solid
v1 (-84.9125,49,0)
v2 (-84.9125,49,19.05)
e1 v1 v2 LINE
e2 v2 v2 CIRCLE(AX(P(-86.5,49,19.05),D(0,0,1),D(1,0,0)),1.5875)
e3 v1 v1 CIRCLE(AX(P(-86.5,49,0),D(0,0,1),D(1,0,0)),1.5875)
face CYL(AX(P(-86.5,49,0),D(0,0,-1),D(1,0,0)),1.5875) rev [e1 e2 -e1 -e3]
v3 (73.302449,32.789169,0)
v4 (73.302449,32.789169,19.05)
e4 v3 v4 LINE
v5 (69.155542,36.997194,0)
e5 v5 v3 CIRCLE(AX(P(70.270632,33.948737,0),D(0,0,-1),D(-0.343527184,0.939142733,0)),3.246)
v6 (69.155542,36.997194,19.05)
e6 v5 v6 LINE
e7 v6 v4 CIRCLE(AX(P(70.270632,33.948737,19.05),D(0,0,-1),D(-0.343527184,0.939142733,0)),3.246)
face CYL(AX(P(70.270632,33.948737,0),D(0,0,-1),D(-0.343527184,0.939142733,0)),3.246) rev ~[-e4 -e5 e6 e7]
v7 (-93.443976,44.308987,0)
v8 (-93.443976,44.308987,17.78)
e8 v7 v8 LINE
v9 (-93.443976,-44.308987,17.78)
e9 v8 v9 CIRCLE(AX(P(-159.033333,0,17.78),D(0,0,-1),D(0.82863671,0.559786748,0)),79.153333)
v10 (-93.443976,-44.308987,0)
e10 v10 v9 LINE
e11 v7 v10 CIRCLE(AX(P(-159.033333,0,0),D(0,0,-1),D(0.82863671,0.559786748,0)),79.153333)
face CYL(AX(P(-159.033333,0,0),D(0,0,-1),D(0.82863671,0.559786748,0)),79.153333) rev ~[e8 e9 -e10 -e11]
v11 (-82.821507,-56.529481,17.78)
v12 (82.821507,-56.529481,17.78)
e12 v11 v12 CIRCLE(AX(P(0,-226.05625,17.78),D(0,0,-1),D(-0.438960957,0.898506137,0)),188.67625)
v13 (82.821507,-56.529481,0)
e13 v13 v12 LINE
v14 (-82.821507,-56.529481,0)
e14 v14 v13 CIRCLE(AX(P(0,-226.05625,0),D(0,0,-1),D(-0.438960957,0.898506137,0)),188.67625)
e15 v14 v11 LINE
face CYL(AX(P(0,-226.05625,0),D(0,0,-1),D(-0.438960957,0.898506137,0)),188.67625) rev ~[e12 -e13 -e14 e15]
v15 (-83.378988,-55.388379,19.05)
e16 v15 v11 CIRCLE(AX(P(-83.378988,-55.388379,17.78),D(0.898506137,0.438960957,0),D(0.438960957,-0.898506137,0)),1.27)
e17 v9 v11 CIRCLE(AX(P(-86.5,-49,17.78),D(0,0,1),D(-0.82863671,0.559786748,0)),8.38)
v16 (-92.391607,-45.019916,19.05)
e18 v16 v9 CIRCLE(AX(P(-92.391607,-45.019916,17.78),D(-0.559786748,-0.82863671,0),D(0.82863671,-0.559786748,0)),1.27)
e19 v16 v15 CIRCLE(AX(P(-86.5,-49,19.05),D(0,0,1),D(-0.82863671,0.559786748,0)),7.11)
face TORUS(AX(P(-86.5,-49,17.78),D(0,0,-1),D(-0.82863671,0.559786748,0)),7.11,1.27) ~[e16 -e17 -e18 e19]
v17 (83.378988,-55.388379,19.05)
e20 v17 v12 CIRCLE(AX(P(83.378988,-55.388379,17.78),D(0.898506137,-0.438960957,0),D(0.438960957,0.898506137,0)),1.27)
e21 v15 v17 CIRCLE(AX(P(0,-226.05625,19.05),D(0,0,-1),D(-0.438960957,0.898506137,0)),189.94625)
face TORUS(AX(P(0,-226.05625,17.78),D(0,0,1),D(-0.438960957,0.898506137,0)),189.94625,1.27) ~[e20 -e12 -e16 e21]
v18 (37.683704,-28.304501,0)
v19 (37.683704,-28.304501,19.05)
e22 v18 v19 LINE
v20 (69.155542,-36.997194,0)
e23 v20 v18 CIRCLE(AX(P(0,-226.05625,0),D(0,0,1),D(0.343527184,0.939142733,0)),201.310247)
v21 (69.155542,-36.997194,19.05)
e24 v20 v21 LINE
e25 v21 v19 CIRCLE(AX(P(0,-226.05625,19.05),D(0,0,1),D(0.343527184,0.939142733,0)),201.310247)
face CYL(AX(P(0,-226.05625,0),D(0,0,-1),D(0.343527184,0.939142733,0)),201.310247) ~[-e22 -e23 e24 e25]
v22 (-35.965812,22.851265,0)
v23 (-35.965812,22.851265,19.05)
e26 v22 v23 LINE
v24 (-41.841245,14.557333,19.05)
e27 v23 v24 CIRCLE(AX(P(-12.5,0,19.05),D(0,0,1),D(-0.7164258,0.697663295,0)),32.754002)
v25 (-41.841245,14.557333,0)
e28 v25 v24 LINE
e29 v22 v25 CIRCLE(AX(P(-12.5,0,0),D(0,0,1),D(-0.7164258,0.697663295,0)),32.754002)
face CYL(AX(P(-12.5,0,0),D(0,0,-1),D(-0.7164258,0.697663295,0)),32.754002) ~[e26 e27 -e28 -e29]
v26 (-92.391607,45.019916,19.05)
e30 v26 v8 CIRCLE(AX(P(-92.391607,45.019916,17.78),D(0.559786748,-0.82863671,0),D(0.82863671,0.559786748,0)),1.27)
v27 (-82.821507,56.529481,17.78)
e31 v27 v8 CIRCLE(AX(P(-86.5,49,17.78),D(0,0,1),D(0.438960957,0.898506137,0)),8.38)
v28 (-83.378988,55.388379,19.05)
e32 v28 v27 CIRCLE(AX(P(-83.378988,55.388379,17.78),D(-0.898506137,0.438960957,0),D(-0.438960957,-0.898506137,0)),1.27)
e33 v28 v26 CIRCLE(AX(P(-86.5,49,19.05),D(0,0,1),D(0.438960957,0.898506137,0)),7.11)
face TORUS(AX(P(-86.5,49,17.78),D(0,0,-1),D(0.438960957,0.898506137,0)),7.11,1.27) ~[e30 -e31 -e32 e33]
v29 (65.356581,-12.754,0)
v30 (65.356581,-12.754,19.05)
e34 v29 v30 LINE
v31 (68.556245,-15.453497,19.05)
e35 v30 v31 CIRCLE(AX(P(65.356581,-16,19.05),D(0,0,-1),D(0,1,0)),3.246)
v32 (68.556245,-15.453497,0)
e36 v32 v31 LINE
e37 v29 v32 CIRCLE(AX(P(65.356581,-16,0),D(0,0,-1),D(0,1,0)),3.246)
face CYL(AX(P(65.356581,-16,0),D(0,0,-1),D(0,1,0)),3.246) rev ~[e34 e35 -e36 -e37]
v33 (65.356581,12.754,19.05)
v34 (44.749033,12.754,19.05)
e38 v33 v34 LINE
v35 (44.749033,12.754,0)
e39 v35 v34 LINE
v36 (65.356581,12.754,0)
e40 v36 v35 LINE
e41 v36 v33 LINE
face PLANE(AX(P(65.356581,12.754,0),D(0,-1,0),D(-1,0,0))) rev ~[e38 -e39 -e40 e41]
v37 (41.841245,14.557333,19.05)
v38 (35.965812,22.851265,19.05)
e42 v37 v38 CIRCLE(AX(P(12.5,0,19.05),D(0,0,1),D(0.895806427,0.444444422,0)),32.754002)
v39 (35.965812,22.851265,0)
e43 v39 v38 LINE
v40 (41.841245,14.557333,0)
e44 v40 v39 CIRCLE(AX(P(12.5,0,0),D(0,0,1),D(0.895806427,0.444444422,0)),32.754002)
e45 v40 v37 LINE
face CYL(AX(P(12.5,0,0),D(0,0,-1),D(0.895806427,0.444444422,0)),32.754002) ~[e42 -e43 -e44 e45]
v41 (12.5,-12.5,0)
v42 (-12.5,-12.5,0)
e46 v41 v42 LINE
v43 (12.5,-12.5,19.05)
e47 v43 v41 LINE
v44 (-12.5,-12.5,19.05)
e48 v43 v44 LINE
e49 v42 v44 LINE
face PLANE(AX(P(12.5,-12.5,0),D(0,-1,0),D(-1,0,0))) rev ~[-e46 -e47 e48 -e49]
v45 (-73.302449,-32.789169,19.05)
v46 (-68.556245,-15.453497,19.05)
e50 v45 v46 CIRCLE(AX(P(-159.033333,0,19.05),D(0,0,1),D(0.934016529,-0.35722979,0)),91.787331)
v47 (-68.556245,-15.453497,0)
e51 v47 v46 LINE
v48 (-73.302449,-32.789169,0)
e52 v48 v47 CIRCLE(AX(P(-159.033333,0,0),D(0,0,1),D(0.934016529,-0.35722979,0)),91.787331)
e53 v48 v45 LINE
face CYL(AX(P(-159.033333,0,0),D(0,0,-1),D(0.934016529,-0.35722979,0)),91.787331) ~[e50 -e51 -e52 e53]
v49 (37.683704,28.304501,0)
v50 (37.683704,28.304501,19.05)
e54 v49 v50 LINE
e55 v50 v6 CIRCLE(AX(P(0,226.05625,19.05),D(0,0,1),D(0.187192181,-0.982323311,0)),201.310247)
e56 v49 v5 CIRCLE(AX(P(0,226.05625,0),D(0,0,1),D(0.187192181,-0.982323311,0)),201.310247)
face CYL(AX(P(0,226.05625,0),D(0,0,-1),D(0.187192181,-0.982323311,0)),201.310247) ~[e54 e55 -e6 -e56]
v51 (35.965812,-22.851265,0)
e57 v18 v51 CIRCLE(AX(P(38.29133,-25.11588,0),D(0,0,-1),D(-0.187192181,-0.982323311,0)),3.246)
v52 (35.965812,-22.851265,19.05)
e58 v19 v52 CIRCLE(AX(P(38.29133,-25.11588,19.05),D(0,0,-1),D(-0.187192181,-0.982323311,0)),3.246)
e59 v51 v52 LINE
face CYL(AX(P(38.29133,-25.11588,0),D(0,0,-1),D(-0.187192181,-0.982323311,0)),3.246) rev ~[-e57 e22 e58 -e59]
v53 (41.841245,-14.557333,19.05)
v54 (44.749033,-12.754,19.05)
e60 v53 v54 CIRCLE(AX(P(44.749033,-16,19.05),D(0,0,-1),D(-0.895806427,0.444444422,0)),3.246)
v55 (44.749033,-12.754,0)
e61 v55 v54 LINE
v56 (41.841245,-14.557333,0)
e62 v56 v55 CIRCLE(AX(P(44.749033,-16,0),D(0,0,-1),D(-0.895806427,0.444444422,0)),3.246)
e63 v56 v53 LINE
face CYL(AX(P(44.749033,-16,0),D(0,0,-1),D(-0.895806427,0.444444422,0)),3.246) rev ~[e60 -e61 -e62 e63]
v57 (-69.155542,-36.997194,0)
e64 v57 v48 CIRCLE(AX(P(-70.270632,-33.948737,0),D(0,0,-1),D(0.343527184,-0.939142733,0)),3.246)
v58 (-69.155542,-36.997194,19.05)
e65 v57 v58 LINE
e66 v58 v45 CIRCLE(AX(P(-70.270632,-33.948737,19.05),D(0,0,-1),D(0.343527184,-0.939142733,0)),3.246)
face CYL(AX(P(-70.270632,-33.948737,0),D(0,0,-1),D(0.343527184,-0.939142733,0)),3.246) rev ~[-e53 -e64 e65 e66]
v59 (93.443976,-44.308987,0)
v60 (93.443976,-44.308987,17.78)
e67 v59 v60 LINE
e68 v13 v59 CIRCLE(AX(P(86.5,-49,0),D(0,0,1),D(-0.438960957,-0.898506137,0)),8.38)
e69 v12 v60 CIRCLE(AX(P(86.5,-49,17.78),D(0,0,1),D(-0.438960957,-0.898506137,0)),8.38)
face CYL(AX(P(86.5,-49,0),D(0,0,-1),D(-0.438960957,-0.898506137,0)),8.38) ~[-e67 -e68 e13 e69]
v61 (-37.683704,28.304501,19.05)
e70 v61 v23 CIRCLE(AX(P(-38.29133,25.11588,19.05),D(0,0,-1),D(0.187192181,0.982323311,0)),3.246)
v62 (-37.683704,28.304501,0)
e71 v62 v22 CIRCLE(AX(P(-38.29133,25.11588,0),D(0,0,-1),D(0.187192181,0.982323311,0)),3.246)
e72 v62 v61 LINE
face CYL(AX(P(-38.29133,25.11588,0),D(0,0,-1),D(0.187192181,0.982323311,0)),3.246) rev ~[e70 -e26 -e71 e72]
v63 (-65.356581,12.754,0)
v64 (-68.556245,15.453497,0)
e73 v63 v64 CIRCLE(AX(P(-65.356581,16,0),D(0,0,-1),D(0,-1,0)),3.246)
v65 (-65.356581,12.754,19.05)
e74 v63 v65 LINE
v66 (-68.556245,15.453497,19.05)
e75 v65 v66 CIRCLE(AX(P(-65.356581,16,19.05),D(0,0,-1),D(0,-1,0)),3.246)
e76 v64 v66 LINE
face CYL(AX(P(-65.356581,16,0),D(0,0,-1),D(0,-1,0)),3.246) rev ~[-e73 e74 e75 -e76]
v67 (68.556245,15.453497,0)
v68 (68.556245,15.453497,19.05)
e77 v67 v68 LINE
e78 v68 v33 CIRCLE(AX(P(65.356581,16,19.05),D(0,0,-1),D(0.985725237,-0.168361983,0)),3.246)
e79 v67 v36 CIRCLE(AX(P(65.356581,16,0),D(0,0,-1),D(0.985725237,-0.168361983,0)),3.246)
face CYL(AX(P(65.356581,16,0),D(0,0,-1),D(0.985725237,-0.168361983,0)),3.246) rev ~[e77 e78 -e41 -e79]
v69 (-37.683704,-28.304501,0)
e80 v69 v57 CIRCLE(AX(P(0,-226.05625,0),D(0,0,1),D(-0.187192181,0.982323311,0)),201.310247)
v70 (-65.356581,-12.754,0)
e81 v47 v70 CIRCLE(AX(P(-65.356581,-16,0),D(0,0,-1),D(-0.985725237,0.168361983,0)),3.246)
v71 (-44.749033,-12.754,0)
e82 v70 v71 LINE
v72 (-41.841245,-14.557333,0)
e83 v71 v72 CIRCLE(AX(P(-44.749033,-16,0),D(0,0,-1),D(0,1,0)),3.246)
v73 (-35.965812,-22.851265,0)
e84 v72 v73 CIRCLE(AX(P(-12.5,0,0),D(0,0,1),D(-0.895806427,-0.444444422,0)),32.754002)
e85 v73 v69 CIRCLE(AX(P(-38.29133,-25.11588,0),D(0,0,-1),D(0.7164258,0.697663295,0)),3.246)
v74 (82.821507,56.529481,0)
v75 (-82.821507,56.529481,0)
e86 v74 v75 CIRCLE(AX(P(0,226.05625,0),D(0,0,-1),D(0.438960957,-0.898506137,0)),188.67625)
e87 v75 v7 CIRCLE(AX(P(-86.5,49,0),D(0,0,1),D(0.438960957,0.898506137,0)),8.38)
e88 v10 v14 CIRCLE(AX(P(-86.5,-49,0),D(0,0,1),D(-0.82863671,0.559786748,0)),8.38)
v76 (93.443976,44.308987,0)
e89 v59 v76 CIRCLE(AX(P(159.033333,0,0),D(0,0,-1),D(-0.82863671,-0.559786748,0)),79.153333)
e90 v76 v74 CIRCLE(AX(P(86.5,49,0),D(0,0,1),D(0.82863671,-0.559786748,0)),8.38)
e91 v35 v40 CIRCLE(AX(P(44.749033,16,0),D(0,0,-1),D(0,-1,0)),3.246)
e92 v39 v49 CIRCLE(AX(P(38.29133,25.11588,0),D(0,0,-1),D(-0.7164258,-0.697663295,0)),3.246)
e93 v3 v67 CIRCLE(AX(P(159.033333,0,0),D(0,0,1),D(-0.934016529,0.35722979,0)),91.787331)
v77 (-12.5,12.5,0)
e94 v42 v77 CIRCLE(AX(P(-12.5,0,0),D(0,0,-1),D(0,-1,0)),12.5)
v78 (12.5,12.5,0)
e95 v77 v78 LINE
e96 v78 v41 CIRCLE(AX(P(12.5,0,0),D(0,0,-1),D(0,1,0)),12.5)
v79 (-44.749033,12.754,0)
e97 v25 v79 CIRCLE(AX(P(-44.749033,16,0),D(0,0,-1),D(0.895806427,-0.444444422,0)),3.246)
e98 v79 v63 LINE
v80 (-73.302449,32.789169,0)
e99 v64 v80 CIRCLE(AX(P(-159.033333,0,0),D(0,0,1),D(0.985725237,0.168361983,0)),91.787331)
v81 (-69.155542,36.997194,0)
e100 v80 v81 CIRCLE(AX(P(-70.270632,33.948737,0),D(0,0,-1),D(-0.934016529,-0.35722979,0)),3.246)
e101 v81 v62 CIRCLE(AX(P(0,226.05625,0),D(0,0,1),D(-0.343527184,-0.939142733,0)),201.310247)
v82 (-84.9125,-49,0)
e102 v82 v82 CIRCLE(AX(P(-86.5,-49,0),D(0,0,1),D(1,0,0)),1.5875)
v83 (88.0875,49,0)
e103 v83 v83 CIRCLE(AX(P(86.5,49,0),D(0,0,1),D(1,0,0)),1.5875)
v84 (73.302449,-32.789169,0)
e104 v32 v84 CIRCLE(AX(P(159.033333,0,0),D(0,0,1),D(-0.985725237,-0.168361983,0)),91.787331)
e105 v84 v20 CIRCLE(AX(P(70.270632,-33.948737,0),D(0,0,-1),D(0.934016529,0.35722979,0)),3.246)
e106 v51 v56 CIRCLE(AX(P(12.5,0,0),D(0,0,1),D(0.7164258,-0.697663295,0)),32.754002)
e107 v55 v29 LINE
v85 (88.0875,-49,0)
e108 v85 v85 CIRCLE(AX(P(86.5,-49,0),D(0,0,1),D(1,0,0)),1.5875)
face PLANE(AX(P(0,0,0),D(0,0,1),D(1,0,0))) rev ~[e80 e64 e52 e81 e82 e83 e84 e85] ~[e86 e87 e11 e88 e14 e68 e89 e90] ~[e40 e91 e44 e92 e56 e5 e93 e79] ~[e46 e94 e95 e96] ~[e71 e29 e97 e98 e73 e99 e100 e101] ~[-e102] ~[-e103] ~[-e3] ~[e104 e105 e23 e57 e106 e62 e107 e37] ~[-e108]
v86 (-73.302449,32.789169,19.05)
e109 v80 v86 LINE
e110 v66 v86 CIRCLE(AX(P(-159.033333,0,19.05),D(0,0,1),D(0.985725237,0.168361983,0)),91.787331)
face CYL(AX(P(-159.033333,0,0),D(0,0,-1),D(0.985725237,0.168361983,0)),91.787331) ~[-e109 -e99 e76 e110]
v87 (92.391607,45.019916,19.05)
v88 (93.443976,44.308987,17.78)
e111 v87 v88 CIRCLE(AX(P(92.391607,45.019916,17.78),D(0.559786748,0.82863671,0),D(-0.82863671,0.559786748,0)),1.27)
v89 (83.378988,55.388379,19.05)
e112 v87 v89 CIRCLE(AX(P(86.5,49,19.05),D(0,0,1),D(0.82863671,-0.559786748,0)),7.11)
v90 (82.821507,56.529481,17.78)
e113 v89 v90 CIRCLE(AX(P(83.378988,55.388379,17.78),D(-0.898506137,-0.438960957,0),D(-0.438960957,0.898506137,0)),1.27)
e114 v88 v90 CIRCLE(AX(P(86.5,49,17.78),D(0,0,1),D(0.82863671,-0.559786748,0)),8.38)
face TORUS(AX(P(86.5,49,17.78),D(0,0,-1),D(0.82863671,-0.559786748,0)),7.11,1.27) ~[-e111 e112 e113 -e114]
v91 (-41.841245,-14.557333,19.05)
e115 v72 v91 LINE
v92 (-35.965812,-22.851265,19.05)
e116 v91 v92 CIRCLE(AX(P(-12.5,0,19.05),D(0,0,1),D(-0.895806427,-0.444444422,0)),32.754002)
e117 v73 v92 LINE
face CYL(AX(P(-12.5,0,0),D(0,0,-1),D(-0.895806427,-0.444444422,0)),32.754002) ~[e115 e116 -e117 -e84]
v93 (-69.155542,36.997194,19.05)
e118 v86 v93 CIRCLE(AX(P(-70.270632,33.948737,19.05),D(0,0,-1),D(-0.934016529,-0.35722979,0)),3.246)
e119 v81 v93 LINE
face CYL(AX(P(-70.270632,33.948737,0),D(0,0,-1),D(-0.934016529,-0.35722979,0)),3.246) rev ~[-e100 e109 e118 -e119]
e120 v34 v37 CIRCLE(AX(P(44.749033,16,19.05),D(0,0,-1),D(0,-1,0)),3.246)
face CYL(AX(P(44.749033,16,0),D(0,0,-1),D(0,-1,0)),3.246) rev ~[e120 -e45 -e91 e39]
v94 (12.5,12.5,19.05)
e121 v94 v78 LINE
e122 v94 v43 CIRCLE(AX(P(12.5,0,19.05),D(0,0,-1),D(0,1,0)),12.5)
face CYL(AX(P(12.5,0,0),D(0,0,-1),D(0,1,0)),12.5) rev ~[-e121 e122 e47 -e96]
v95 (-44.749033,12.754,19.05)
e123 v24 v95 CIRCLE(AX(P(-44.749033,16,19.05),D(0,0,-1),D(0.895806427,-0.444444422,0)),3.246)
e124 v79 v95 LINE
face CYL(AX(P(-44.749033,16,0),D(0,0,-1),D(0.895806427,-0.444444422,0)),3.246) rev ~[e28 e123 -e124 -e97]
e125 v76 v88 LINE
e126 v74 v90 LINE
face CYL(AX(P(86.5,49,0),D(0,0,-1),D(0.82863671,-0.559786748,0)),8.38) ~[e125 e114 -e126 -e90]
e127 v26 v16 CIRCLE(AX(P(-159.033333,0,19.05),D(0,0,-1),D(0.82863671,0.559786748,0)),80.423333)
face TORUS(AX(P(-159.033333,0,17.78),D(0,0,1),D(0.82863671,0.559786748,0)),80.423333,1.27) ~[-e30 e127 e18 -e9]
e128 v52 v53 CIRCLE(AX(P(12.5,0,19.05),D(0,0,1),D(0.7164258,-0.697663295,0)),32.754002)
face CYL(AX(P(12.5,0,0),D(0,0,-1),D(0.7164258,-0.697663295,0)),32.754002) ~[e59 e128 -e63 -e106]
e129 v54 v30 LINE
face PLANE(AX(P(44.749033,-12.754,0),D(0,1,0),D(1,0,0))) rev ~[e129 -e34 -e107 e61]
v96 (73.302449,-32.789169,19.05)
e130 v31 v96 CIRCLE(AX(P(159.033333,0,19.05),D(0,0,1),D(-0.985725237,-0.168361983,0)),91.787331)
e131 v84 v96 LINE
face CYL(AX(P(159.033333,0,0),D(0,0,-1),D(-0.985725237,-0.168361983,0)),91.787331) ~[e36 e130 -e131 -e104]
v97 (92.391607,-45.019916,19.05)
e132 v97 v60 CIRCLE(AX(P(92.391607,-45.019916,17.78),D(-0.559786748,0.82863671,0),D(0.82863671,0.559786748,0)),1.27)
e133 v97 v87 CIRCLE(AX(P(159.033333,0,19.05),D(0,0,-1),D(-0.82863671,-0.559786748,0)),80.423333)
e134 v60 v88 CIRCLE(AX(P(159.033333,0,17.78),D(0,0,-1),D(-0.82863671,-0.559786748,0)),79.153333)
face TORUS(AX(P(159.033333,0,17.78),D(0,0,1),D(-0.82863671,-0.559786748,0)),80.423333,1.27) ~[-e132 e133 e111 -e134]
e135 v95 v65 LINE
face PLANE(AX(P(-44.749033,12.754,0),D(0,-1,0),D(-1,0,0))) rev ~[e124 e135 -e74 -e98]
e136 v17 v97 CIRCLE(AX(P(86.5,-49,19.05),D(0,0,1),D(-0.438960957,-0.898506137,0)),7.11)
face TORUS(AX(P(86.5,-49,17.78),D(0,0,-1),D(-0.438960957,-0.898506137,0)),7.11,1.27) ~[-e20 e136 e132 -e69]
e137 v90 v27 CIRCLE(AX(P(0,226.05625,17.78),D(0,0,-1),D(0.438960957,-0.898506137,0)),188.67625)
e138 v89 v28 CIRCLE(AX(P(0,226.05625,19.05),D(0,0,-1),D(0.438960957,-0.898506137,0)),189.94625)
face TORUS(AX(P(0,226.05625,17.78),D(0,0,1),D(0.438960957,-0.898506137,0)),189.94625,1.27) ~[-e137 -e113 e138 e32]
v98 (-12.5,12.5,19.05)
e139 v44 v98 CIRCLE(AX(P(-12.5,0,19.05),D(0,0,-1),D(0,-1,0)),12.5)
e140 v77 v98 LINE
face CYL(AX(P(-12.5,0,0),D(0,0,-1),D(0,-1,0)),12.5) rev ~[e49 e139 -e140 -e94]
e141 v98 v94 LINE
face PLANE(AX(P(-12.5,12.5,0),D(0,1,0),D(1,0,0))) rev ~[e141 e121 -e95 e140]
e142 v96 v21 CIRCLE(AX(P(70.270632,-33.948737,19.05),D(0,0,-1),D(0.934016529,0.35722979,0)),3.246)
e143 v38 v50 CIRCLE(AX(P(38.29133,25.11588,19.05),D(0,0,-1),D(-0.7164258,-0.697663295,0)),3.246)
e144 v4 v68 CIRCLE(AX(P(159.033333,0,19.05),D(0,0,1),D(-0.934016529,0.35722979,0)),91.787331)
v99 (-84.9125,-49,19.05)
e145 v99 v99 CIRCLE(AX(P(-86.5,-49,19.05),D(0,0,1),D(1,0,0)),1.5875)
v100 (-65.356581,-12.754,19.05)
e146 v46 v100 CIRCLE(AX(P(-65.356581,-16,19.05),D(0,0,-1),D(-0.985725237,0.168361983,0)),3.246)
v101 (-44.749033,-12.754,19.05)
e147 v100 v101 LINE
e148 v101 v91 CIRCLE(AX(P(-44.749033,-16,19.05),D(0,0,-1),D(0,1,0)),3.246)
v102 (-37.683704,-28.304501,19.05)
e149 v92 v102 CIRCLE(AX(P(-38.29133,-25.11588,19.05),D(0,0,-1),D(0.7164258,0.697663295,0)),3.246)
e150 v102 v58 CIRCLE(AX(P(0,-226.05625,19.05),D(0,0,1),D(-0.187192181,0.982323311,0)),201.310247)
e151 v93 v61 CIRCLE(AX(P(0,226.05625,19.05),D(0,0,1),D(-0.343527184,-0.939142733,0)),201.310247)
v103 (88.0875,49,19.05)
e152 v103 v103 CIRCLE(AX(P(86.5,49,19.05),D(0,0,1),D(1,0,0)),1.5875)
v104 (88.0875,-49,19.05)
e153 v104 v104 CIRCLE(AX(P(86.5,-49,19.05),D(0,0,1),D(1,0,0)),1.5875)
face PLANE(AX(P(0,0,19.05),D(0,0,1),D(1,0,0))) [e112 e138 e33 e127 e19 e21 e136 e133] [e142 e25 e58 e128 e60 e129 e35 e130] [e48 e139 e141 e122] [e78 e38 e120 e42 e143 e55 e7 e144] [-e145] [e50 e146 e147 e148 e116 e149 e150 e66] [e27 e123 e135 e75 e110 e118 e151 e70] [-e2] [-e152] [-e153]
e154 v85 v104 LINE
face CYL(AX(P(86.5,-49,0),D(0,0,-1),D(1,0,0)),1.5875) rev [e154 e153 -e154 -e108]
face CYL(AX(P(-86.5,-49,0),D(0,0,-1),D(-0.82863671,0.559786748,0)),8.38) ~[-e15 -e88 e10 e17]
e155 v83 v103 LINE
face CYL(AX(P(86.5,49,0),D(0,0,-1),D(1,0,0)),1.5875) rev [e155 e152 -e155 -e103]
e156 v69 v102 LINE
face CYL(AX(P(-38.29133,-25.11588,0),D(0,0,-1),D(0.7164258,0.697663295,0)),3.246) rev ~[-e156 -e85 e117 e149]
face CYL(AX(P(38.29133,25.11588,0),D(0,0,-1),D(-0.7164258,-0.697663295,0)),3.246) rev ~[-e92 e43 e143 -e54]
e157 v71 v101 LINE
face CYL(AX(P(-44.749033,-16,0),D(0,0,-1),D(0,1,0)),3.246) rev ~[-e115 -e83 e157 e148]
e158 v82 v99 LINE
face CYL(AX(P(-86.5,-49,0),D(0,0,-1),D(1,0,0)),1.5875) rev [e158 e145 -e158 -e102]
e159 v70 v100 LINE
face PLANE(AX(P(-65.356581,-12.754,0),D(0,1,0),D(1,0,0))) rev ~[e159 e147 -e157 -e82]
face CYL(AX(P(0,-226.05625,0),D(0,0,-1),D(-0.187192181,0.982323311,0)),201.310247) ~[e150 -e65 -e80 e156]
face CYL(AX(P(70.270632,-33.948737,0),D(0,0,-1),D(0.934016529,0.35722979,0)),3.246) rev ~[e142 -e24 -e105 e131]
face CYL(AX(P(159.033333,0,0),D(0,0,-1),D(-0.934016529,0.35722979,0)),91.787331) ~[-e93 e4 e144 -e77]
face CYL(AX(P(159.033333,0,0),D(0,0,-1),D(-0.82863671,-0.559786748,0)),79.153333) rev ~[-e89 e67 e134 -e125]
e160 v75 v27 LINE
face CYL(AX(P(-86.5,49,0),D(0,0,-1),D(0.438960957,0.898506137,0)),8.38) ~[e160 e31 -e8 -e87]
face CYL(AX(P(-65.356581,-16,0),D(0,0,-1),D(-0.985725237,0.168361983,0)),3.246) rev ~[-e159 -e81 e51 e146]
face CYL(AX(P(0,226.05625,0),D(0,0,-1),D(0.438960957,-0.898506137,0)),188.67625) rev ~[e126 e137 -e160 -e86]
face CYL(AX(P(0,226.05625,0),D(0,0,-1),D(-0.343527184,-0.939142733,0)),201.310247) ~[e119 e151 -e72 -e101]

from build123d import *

# Parameters (mm, degrees)
F0_R     = 1.5875
F1_DEPTH = 19.05
F0_R_2   = 3.175
F2_DEPTH = 6.35
F3_R     = 1.27


with BuildPart() as f1:
    # F0 (on Top) → F1 (new body)
    with BuildSketch(Plane.XY):
        with BuildLine():
            ThreePointArc((82.8215071839, 56.5294814298), (0, 37.38), (-82.8215071839, 56.5294814298))
            ThreePointArc((-82.8215071839, 56.5294814298), (-92.8246316261, 54.4975844509), (-93.4439756283, 44.3089870526))
            ThreePointArc((-93.4439756283, 44.3089870526), (-79.88, 0), (-93.4439756283, -44.3089870526))
            ThreePointArc((-93.4439756283, -44.3089870526), (-92.8246316261, -54.4975844509), (-82.8215071839, -56.5294814298))
            ThreePointArc((-82.8215071839, -56.5294814298), (0, -37.38), (82.8215071839, -56.5294814298))
            ThreePointArc((82.8215071839, -56.5294814298), (92.8246316261, -54.4975844509), (93.4439756283, -44.3089870526))
            ThreePointArc((93.4439756283, -44.3089870526), (79.88, 0), (93.4439756283, 44.3089870526))
            ThreePointArc((93.4439756283, 44.3089870526), (92.8246316261, 54.4975844509), (82.8215071839, 56.5294814298))
        make_face()
        with Locations((-86.5, -49)):
            Circle(F0_R, mode=Mode.SUBTRACT)
        with BuildLine():
            ThreePointArc((-44.7490329893, -12.754), (-43.0382407412, -13.2414304642), (-41.8412453259, -14.557333405))
            ThreePointArc((-41.8412453259, -14.557333405), (-39.2272080278, -18.9335940639), (-35.965811948, -22.8512647956))
            ThreePointArc((-35.965811948, -22.8512647956), (-35.1953196756, -26.0911928639), (-37.6837042763, -28.304501317))
            ThreePointArc((-37.6837042763, -28.304501317), (-53.5961461859, -32.0117479156), (-69.1555424288, -36.9971940769))
            ThreePointArc((-69.1555424288, -36.9971940769), (-72.5826288572, -36.2271539786), (-73.3024493232, -32.7891688656))
            ThreePointArc((-73.3024493232, -32.7891688656), (-70.5039949655, -24.2377869494), (-68.556245082, -15.4534970032))
            ThreePointArc((-68.556245082, -15.4534970032), (-67.4497325668, -13.5190259244), (-65.356580963, -12.754))
            Line((-65.356580963, -12.754), (-44.7490329893, -12.754))
        make_face(mode=Mode.SUBTRACT)
        with Locations((86.5, -49)):
            Circle(F0_R, mode=Mode.SUBTRACT)
        with BuildLine():
            ThreePointArc((-12.5, -12.5), (-25, 0), (-12.5, 12.5))
            Line((-12.5, 12.5), (12.5, 12.5))
            ThreePointArc((12.5, 12.5), (25, 0), (12.5, -12.5))
            Line((12.5, -12.5), (-12.5, -12.5))
        make_face(mode=Mode.SUBTRACT)
        with BuildLine():
            ThreePointArc((65.356580963, -12.754), (67.4497325668, -13.5190259244), (68.556245082, -15.4534970032))
            ThreePointArc((68.556245082, -15.4534970032), (70.5039949655, -24.2377869494), (73.3024493232, -32.7891688656))
            ThreePointArc((73.3024493232, -32.7891688656), (72.5826288572, -36.2271539786), (69.1555424288, -36.9971940769))
            ThreePointArc((69.1555424288, -36.9971940769), (53.5961461859, -32.0117479156), (37.6837042763, -28.304501317))
            ThreePointArc((37.6837042763, -28.304501317), (35.1953196756, -26.0911928639), (35.965811948, -22.8512647956))
            ThreePointArc((35.965811948, -22.8512647956), (39.2272080278, -18.9335940639), (41.8412453259, -14.557333405))
            ThreePointArc((41.8412453259, -14.557333405), (43.0382407412, -13.2414304642), (44.7490329893, -12.754))
            Line((44.7490329893, -12.754), (65.356580963, -12.754))
        make_face(mode=Mode.SUBTRACT)
        with BuildLine():
            ThreePointArc((-73.3024493232, 32.7891688656), (-72.5826288572, 36.2271539786), (-69.1555424288, 36.9971940769))
            ThreePointArc((-69.1555424288, 36.9971940769), (-53.5961461859, 32.0117479156), (-37.6837042763, 28.304501317))
            ThreePointArc((-37.6837042763, 28.304501317), (-35.1953196756, 26.0911928639), (-35.965811948, 22.8512647956))
            ThreePointArc((-35.965811948, 22.8512647956), (-39.2272080278, 18.9335940639), (-41.8412453259, 14.557333405))
            ThreePointArc((-41.8412453259, 14.557333405), (-43.0382407412, 13.2414304642), (-44.7490329893, 12.754))
            Line((-44.7490329893, 12.754), (-65.356580963, 12.754))
            ThreePointArc((-65.356580963, 12.754), (-67.4497325668, 13.5190259244), (-68.556245082, 15.4534970032))
            ThreePointArc((-68.556245082, 15.4534970032), (-70.5039949655, 24.2377869494), (-73.3024493232, 32.7891688656))
        make_face(mode=Mode.SUBTRACT)
        with Locations((-86.5, 49)):
            Circle(F0_R, mode=Mode.SUBTRACT)
        with BuildLine():
            ThreePointArc((35.965811948, 22.8512647956), (35.1953196756, 26.0911928639), (37.6837042763, 28.304501317))
            ThreePointArc((37.6837042763, 28.304501317), (53.5961461859, 32.0117479156), (69.1555424288, 36.9971940769))
            ThreePointArc((69.1555424288, 36.9971940769), (72.5826288572, 36.2271539786), (73.3024493232, 32.7891688656))
            ThreePointArc((73.3024493232, 32.7891688656), (70.5039949655, 24.2377869494), (68.556245082, 15.4534970032))
            ThreePointArc((68.556245082, 15.4534970032), (67.4497325668, 13.5190259244), (65.356580963, 12.754))
            Line((65.356580963, 12.754), (44.7490329893, 12.754))
            ThreePointArc((44.7490329893, 12.754), (43.0382407412, 13.2414304642), (41.8412453259, 14.557333405))
            ThreePointArc((41.8412453259, 14.557333405), (39.2272080278, 18.9335940639), (35.965811948, 22.8512647956))
        make_face(mode=Mode.SUBTRACT)
        with Locations((86.5, 49)):
            Circle(F0_R, mode=Mode.SUBTRACT)
    extrude(amount=F1_DEPTH)

    # F0 (on Top) → F2 (cut)
    with BuildSketch(Plane.XY):
        with BuildLine():
            Line((12.5, 12.5), (-12.5, 12.5))
            ThreePointArc((-12.5, 12.5), (-25, 0), (-12.5, -12.5))
            Line((-12.5, -12.5), (12.5, -12.5))
            ThreePointArc((12.5, -12.5), (25, 0), (12.5, 12.5))
        make_face()
        with Locations((-12.5, 0)):
            Circle(F0_R_2, mode=Mode.SUBTRACT)
        with Locations((12.5, 0)):
            Circle(F0_R_2, mode=Mode.SUBTRACT)
    extrude(amount=F2_DEPTH, mode=Mode.SUBTRACT)

    # F3
    f3_edges = [f1.edges().sort_by_distance(p)[0] for p in [
        (-79.88, 0, 19.05),
        (-92.824632, -54.497584, 19.05),
        (0, -37.38, 19.05),
        (92.824632, -54.497584, 19.05),
        (79.88, 0, 19.05),
        (92.824632, 54.497584, 19.05),
        (0, 37.38, 19.05),
        (-92.824632, 54.497584, 19.05),
    ]]
    fillet(f3_edges, radius=F3_R)


solid = f1.part
